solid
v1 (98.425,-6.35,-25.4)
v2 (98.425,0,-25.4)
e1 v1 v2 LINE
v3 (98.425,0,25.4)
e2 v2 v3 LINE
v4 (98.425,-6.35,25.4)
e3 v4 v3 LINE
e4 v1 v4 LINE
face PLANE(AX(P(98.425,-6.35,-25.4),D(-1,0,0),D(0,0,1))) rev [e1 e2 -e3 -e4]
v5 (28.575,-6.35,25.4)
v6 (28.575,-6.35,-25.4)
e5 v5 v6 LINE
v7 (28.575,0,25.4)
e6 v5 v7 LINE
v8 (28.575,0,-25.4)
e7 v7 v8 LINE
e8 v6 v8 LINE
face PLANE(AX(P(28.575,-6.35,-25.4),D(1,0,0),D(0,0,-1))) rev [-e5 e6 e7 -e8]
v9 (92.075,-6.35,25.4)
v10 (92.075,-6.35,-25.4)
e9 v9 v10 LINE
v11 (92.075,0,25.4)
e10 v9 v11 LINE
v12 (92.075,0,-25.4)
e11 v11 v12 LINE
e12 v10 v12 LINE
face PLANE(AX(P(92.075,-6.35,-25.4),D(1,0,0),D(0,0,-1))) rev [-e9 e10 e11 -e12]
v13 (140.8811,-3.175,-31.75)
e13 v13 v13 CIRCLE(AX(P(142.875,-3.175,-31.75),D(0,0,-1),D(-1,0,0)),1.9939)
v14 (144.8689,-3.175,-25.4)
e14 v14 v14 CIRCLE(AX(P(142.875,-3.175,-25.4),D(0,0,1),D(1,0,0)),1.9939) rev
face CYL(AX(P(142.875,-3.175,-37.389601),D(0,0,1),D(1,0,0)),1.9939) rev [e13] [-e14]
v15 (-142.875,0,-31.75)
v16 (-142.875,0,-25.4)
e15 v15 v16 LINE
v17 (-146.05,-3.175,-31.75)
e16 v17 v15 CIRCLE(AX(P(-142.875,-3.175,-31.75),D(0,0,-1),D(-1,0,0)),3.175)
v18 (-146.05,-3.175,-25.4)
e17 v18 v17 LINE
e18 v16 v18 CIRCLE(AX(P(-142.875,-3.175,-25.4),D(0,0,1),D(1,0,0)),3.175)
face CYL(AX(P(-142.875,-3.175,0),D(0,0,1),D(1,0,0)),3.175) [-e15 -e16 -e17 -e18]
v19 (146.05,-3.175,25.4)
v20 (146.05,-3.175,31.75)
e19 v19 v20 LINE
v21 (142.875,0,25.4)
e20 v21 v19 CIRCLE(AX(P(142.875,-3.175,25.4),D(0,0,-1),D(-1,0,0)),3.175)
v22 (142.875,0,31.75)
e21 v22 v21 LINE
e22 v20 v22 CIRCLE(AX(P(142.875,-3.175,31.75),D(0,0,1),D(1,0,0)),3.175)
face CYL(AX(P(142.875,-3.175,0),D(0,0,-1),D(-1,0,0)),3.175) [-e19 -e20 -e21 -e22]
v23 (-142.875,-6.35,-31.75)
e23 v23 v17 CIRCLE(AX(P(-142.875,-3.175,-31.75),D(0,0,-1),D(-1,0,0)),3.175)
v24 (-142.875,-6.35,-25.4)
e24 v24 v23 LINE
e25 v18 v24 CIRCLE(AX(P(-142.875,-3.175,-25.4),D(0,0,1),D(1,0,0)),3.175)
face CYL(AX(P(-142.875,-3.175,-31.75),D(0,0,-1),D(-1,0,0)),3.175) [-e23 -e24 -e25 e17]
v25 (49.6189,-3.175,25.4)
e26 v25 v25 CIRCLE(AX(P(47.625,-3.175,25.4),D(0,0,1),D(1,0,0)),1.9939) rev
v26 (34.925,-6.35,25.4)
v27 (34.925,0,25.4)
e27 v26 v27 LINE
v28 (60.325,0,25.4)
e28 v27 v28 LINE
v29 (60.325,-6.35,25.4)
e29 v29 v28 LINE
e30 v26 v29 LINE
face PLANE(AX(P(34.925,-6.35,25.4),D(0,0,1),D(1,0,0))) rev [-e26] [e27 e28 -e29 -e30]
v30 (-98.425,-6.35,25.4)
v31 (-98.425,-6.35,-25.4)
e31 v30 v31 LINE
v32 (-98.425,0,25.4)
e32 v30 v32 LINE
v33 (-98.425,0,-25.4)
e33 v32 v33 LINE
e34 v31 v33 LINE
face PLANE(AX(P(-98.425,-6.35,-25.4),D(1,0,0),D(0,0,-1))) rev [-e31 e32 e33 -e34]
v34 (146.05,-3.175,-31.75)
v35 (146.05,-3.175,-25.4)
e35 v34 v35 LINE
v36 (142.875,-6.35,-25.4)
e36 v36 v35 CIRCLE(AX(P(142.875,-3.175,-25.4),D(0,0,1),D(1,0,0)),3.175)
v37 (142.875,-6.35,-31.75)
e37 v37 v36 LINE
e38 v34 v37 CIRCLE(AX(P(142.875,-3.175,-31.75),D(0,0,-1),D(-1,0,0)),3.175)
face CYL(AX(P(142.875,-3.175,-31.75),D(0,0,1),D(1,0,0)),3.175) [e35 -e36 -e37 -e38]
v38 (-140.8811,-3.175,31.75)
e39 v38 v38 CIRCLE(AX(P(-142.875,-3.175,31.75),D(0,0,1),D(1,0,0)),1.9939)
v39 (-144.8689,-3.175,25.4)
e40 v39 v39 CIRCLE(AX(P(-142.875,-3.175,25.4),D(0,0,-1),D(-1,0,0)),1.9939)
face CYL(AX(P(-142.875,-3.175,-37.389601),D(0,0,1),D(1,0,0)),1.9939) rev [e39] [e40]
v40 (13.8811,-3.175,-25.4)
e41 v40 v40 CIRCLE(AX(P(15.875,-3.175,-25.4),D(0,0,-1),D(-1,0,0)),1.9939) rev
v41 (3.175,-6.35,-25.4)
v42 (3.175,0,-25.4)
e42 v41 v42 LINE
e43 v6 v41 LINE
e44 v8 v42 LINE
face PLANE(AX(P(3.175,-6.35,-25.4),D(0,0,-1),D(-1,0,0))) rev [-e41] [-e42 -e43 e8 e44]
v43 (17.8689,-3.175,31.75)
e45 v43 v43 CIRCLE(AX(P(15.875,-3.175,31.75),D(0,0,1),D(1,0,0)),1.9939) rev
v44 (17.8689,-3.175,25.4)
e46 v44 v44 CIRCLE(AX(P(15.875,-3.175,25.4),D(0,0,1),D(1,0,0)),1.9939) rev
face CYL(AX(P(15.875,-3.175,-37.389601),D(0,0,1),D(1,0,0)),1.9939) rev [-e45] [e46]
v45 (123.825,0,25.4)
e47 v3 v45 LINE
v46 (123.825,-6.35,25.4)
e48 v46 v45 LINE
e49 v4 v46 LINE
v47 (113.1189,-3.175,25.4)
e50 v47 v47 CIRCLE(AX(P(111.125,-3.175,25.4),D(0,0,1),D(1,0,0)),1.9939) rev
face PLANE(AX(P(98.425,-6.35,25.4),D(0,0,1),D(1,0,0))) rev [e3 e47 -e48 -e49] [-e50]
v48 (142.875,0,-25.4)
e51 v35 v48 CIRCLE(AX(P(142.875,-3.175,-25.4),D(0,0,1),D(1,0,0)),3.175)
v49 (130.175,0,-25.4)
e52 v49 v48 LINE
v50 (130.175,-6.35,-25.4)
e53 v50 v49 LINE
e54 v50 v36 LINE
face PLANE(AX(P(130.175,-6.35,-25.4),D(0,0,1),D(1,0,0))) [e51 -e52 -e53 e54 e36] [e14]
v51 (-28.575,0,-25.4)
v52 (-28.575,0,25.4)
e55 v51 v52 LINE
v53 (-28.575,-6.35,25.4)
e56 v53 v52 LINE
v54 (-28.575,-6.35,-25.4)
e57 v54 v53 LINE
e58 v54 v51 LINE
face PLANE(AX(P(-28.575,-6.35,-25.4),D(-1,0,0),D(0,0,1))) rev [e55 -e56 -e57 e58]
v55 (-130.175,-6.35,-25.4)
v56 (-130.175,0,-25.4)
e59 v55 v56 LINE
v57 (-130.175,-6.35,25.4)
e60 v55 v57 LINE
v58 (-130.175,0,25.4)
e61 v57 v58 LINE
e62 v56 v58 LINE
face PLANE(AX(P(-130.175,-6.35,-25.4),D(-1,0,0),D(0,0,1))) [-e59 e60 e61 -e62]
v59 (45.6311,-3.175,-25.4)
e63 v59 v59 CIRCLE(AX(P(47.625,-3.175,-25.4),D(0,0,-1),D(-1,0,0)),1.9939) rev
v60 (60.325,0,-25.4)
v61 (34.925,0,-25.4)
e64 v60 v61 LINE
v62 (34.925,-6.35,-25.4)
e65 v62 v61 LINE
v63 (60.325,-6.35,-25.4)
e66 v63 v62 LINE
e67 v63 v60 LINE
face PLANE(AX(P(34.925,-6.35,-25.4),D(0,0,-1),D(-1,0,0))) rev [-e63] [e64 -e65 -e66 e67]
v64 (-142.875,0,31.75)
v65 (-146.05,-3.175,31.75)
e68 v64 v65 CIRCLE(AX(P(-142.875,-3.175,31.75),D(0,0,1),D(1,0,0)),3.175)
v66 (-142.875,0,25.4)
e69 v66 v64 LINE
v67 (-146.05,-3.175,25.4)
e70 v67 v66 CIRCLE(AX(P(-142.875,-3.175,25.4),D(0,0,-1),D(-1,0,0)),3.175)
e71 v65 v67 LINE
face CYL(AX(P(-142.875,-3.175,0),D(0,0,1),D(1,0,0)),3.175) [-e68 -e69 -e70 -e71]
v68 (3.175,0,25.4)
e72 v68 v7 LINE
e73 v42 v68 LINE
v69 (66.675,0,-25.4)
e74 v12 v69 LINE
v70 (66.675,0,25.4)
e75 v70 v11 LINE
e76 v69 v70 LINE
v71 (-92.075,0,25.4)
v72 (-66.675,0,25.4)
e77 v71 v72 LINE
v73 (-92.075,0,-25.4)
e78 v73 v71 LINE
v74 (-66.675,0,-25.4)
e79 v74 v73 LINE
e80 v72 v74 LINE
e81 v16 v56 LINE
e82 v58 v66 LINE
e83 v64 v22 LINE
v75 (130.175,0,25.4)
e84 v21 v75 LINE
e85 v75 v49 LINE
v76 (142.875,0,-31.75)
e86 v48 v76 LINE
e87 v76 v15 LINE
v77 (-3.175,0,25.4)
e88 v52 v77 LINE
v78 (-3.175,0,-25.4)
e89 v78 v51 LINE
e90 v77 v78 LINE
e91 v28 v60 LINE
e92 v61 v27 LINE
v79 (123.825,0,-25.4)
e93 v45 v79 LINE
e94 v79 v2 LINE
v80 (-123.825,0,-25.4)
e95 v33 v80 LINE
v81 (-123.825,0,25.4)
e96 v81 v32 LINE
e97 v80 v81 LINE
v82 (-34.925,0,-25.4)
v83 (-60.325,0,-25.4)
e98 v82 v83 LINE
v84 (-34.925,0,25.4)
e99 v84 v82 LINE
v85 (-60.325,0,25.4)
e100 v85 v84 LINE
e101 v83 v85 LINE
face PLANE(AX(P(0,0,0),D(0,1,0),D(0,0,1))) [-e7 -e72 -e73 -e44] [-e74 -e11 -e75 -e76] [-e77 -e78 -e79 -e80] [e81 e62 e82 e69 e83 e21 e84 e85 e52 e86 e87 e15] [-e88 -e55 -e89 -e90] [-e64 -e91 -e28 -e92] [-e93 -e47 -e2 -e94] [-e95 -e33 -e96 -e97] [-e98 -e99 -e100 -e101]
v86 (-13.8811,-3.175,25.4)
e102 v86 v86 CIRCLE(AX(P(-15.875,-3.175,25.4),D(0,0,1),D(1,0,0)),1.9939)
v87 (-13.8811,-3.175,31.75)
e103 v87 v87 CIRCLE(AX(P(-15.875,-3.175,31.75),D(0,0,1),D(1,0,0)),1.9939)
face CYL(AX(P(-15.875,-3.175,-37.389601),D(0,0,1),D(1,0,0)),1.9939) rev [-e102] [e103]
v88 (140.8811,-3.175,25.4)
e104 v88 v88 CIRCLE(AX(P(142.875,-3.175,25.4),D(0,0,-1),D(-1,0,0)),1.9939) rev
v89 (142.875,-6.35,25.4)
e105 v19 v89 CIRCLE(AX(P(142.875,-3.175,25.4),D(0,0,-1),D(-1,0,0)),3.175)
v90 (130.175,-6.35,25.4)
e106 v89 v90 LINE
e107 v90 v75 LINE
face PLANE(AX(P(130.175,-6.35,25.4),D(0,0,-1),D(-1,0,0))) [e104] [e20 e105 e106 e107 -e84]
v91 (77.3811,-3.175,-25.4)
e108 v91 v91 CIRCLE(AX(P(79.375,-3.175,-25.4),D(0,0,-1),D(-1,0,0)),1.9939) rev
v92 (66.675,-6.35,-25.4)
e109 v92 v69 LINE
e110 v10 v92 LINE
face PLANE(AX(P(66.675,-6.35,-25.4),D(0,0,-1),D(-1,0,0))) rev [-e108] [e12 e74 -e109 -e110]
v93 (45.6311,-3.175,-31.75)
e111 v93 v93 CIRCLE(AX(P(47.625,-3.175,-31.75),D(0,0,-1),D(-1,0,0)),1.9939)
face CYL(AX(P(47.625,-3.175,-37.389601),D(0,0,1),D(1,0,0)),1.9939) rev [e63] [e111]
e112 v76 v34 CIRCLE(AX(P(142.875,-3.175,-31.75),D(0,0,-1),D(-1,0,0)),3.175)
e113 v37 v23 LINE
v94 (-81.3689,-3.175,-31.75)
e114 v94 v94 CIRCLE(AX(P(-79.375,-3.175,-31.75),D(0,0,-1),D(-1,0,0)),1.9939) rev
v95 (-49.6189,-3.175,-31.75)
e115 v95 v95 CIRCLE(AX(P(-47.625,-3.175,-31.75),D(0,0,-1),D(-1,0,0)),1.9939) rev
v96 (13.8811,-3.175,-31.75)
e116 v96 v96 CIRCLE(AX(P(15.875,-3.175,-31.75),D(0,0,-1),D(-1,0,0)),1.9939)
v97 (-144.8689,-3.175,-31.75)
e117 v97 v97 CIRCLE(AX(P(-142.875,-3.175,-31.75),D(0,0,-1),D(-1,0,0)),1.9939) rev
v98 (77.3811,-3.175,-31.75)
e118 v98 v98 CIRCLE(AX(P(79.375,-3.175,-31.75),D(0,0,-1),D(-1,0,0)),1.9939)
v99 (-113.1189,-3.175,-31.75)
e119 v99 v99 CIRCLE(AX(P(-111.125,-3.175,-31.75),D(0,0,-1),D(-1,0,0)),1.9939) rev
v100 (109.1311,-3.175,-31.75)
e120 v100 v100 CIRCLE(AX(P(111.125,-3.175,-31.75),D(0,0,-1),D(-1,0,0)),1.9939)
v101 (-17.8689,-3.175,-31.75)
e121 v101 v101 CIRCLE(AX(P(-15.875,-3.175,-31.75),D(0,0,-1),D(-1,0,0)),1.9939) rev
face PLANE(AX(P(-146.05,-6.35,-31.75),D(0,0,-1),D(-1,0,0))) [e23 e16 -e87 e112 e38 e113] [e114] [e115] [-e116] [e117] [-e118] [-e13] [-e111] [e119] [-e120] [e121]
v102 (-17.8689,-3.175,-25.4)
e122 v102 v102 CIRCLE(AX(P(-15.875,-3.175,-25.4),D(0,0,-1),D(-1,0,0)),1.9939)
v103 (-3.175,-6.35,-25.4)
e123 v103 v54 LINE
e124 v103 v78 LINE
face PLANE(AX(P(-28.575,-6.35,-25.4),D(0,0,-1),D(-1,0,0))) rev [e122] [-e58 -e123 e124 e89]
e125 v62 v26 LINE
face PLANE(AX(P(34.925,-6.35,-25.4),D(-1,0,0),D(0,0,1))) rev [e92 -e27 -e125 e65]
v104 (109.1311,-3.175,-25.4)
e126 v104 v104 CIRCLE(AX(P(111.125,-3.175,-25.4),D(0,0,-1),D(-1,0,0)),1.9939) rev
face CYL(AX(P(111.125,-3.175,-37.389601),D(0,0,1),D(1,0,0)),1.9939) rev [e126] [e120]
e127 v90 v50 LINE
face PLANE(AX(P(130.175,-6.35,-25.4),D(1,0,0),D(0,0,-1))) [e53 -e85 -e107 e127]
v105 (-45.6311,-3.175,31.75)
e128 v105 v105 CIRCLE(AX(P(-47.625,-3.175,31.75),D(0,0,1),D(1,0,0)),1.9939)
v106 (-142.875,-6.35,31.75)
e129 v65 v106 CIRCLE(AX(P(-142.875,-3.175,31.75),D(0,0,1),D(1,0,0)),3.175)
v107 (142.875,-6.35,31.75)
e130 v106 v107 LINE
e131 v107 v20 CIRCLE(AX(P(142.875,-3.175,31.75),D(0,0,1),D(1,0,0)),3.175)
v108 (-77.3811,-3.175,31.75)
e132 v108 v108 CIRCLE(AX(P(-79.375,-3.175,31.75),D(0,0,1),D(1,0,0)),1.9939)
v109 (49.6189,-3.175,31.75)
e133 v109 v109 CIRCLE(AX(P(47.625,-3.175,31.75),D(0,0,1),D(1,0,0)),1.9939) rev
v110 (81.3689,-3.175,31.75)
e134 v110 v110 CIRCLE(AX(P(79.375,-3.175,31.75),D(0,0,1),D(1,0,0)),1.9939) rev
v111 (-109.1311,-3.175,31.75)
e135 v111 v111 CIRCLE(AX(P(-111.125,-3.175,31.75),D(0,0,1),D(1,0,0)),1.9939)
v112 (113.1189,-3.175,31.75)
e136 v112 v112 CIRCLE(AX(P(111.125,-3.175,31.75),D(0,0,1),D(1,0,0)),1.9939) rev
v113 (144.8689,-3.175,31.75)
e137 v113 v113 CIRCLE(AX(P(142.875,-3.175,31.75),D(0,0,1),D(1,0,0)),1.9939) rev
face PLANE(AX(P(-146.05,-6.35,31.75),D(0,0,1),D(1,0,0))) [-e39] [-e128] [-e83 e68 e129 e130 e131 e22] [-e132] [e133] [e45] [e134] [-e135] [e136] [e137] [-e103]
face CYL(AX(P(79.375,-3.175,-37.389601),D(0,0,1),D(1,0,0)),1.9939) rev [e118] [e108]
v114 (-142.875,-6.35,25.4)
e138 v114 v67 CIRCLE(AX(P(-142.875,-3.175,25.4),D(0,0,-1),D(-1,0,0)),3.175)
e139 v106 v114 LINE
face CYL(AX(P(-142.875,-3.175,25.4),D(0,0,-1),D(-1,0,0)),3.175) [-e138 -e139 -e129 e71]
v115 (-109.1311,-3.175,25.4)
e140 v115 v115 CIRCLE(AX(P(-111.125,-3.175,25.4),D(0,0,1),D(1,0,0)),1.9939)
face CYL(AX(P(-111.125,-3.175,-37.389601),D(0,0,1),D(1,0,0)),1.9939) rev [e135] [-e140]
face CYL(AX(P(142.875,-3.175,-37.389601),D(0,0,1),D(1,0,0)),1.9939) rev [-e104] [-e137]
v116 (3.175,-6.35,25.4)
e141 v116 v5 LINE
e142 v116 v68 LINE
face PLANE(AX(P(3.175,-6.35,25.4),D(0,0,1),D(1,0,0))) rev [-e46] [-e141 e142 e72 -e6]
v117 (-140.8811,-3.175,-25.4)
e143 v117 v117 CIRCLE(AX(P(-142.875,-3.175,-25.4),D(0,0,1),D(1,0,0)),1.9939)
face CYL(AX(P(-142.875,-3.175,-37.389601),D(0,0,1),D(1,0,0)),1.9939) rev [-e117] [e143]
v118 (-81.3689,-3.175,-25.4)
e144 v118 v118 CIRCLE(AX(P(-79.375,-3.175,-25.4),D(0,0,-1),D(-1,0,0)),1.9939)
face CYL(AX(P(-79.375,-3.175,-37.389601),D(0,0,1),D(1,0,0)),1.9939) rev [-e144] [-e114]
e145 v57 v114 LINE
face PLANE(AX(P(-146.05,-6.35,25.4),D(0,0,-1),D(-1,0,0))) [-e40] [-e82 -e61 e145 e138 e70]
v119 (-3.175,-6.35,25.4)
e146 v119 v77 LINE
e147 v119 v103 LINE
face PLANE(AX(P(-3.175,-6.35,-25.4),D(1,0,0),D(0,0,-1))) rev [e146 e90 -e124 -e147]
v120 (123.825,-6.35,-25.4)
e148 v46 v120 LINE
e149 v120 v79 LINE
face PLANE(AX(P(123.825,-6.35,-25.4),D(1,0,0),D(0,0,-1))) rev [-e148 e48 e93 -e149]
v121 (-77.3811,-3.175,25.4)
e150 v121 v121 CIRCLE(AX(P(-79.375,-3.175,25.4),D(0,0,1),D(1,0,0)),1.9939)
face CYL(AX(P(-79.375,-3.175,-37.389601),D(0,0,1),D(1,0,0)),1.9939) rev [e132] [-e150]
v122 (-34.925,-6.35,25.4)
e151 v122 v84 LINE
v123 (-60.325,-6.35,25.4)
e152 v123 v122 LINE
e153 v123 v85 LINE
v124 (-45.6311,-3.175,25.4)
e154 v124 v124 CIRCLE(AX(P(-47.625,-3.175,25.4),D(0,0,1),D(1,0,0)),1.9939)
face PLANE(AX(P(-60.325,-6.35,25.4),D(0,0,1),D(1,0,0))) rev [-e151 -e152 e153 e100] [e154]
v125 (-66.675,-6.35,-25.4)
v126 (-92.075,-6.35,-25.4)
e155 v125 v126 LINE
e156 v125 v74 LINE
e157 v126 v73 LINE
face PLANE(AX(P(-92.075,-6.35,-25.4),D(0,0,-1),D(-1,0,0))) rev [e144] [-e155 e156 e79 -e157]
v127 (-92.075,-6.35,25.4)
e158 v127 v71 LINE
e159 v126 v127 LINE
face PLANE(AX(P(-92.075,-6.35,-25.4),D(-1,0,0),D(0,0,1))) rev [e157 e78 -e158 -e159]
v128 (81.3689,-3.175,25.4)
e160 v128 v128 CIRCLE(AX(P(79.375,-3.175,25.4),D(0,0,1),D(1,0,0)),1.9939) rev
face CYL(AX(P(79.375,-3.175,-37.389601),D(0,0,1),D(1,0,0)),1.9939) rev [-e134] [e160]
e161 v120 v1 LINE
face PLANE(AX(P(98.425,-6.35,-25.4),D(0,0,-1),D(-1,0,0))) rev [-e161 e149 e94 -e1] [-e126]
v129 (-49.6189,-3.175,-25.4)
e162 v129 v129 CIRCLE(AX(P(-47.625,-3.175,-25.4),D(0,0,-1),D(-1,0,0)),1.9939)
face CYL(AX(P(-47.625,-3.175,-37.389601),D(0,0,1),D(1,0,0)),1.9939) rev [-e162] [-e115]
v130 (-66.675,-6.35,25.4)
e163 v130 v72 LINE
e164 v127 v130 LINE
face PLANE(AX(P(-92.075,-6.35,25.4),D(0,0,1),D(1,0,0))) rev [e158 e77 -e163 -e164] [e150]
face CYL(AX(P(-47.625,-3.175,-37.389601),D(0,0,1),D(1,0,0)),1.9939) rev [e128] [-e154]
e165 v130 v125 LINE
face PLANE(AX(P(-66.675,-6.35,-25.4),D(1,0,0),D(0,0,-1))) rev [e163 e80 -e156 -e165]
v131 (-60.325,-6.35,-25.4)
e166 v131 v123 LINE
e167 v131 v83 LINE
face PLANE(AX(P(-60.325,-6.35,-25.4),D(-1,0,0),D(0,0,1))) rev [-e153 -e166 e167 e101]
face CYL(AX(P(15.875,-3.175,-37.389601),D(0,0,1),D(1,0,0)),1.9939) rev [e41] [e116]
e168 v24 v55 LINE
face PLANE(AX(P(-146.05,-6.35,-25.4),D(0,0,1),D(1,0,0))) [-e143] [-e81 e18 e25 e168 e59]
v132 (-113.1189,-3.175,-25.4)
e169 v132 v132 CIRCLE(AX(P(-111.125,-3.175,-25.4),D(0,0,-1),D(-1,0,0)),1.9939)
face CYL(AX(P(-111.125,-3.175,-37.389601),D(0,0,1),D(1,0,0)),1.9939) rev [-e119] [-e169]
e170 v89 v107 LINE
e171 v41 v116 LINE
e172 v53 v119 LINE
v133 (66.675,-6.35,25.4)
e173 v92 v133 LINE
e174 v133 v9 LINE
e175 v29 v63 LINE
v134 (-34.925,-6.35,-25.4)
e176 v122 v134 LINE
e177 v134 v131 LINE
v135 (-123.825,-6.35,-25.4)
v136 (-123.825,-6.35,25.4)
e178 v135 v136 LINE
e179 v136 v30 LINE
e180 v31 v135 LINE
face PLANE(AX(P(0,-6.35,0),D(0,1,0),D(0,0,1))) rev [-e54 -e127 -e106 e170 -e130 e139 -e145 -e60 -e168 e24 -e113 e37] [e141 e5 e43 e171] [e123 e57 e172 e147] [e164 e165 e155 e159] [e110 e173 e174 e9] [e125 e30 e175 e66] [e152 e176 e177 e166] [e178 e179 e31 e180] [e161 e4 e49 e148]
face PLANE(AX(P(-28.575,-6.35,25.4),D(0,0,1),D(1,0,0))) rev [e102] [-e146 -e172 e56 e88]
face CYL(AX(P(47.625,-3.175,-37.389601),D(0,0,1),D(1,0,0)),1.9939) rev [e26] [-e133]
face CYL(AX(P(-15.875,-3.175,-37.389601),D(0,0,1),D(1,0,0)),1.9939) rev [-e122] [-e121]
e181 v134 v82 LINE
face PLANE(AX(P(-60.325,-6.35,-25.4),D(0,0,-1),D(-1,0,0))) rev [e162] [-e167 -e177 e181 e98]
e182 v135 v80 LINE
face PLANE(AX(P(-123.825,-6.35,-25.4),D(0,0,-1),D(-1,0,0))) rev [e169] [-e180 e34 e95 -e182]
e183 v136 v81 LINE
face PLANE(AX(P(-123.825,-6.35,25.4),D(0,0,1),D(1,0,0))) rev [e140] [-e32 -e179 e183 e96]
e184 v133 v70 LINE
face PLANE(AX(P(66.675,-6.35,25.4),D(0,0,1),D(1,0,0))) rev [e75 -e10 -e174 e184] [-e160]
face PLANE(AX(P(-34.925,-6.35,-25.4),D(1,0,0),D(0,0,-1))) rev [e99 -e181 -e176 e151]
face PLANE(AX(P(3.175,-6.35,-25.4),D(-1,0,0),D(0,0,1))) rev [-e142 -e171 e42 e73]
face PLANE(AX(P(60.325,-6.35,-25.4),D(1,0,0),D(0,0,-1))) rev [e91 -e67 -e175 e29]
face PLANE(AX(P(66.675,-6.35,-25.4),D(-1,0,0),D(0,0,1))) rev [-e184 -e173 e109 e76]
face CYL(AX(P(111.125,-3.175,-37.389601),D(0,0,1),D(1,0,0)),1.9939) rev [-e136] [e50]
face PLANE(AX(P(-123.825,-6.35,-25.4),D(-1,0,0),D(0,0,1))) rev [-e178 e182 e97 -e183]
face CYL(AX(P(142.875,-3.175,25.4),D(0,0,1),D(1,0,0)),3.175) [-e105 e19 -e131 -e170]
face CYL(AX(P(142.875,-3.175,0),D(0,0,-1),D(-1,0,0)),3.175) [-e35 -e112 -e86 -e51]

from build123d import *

# Parameters (mm, degrees)
SKETCH1_W           = 25.4
SKETCH1_H           = 50.8
BOSS_EXTRUDE1_DEPTH = 6.35
CUT_EXTRUDE1_REACH  = 161.384
SKETCH2_R           = 1.9939
FILLET2_R           = 3.175


with BuildPart() as part:
    # Sketch1 → Boss-Extrude1 (new body)
    with BuildSketch(Plane(origin=(0, 0, 0), x_dir=(1, 0, 0), z_dir=(0, 1, 0))):
        Polygon((-146.05, 25.4), (-130.175, 25.4), (-130.175, -25.4), (-146.05, -25.4), (-146.05, -31.75), (146.05, -31.75), (146.05, -25.4), (130.175, -25.4), (130.175, 25.4), (146.05, 25.4), (146.05, 31.75), (-146.05, 31.75), align=None)
        with Locations((-15.875, 0)):
            Rectangle(SKETCH1_W, SKETCH1_H, mode=Mode.SUBTRACT)
        with Locations((111.125, 0)):
            Rectangle(SKETCH1_W, SKETCH1_H, mode=Mode.SUBTRACT)
        with Locations((-47.625, 0)):
            Rectangle(SKETCH1_W, SKETCH1_H, mode=Mode.SUBTRACT)
        with Locations((-79.375, 0)):
            Rectangle(SKETCH1_W, SKETCH1_H, mode=Mode.SUBTRACT)
        with Locations((-111.125, 0)):
            Rectangle(SKETCH1_W, SKETCH1_H, mode=Mode.SUBTRACT)
        with Locations((79.375, 0)):
            Rectangle(SKETCH1_W, SKETCH1_H, mode=Mode.SUBTRACT)
        with Locations((47.625, 0)):
            Rectangle(SKETCH1_W, SKETCH1_H, mode=Mode.SUBTRACT)
        with Locations((15.875, 0)):
            Rectangle(SKETCH1_W, SKETCH1_H, mode=Mode.SUBTRACT)
    extrude(amount=-BOSS_EXTRUDE1_DEPTH)

    # Cut-Extrude1: up to this face of the body (flat: up to its plane)
    cut_extrude1_end = Plane(part.part.faces().sort_by_distance((0, -3.175, -31.75))[0])
    # Sketch2 → Cut-Extrude1 (cut, up to the picked face)
    with BuildSketch(Plane.XY.offset(31.75), mode=Mode.PRIVATE) as cut_extrude1_sk1:
        with Locations((-142.875, -3.175)):
            Circle(SKETCH2_R)
    cut_extrude1_tool1 = split(extrude(cut_extrude1_sk1.sketch, amount=-CUT_EXTRUDE1_REACH, mode=Mode.PRIVATE), bisect_by=cut_extrude1_end, keep=Keep.BOTH, mode=Mode.PRIVATE)
    # Sketch2 → Cut-Extrude1 (cut, up to the picked face)
    with BuildSketch(Plane.XY.offset(31.75), mode=Mode.PRIVATE) as cut_extrude1_sk2:
        with Locations((-111.125, -3.175)):
            Circle(SKETCH2_R)
    cut_extrude1_tool2 = split(extrude(cut_extrude1_sk2.sketch, amount=-CUT_EXTRUDE1_REACH, mode=Mode.PRIVATE), bisect_by=cut_extrude1_end, keep=Keep.BOTH, mode=Mode.PRIVATE)
    # Sketch2 → Cut-Extrude1 (cut, up to the picked face)
    with BuildSketch(Plane.XY.offset(31.75), mode=Mode.PRIVATE) as cut_extrude1_sk3:
        with Locations((-79.375, -3.175)):
            Circle(SKETCH2_R)
    cut_extrude1_tool3 = split(extrude(cut_extrude1_sk3.sketch, amount=-CUT_EXTRUDE1_REACH, mode=Mode.PRIVATE), bisect_by=cut_extrude1_end, keep=Keep.BOTH, mode=Mode.PRIVATE)
    # Sketch2 → Cut-Extrude1 (cut, up to the picked face)
    with BuildSketch(Plane.XY.offset(31.75), mode=Mode.PRIVATE) as cut_extrude1_sk4:
        with Locations((-47.625, -3.175)):
            Circle(SKETCH2_R)
    cut_extrude1_tool4 = split(extrude(cut_extrude1_sk4.sketch, amount=-CUT_EXTRUDE1_REACH, mode=Mode.PRIVATE), bisect_by=cut_extrude1_end, keep=Keep.BOTH, mode=Mode.PRIVATE)
    # Sketch2 → Cut-Extrude1 (cut, up to the picked face)
    with BuildSketch(Plane.XY.offset(31.75), mode=Mode.PRIVATE) as cut_extrude1_sk5:
        with Locations((-15.875, -3.175)):
            Circle(SKETCH2_R)
    cut_extrude1_tool5 = split(extrude(cut_extrude1_sk5.sketch, amount=-CUT_EXTRUDE1_REACH, mode=Mode.PRIVATE), bisect_by=cut_extrude1_end, keep=Keep.BOTH, mode=Mode.PRIVATE)
    # Sketch2 → Cut-Extrude1 (cut, up to the picked face)
    with BuildSketch(Plane.XY.offset(31.75), mode=Mode.PRIVATE) as cut_extrude1_sk6:
        with Locations((15.875, -3.175)):
            Circle(SKETCH2_R)
    cut_extrude1_tool6 = split(extrude(cut_extrude1_sk6.sketch, amount=-CUT_EXTRUDE1_REACH, mode=Mode.PRIVATE), bisect_by=cut_extrude1_end, keep=Keep.BOTH, mode=Mode.PRIVATE)
    # Sketch2 → Cut-Extrude1 (cut, up to the picked face)
    with BuildSketch(Plane.XY.offset(31.75), mode=Mode.PRIVATE) as cut_extrude1_sk7:
        with Locations((47.625, -3.175)):
            Circle(SKETCH2_R)
    cut_extrude1_tool7 = split(extrude(cut_extrude1_sk7.sketch, amount=-CUT_EXTRUDE1_REACH, mode=Mode.PRIVATE), bisect_by=cut_extrude1_end, keep=Keep.BOTH, mode=Mode.PRIVATE)
    # Sketch2 → Cut-Extrude1 (cut, up to the picked face)
    with BuildSketch(Plane.XY.offset(31.75), mode=Mode.PRIVATE) as cut_extrude1_sk8:
        with Locations((79.375, -3.175)):
            Circle(SKETCH2_R)
    cut_extrude1_tool8 = split(extrude(cut_extrude1_sk8.sketch, amount=-CUT_EXTRUDE1_REACH, mode=Mode.PRIVATE), bisect_by=cut_extrude1_end, keep=Keep.BOTH, mode=Mode.PRIVATE)
    # Sketch2 → Cut-Extrude1 (cut, up to the picked face)
    with BuildSketch(Plane.XY.offset(31.75), mode=Mode.PRIVATE) as cut_extrude1_sk9:
        with Locations((111.125, -3.175)):
            Circle(SKETCH2_R)
    cut_extrude1_tool9 = split(extrude(cut_extrude1_sk9.sketch, amount=-CUT_EXTRUDE1_REACH, mode=Mode.PRIVATE), bisect_by=cut_extrude1_end, keep=Keep.BOTH, mode=Mode.PRIVATE)
    # Sketch2 → Cut-Extrude1 (cut, up to the picked face)
    with BuildSketch(Plane.XY.offset(31.75), mode=Mode.PRIVATE) as cut_extrude1_sk10:
        with Locations((142.875, -3.175)):
            Circle(SKETCH2_R)
    cut_extrude1_tool10 = split(extrude(cut_extrude1_sk10.sketch, amount=-CUT_EXTRUDE1_REACH, mode=Mode.PRIVATE), bisect_by=cut_extrude1_end, keep=Keep.BOTH, mode=Mode.PRIVATE)
    add(cut_extrude1_tool1.solids().sort_by(Axis((-142.875, -3.175, 31.75), (0, 0, -1)))[0], mode=Mode.SUBTRACT)
    add(cut_extrude1_tool2.solids().sort_by(Axis((-111.125, -3.175, 31.75), (0, 0, -1)))[0], mode=Mode.SUBTRACT)
    add(cut_extrude1_tool3.solids().sort_by(Axis((-79.375, -3.175, 31.75), (0, 0, -1)))[0], mode=Mode.SUBTRACT)
    add(cut_extrude1_tool4.solids().sort_by(Axis((-47.625, -3.175, 31.75), (0, 0, -1)))[0], mode=Mode.SUBTRACT)
    add(cut_extrude1_tool5.solids().sort_by(Axis((-15.875, -3.175, 31.75), (0, 0, -1)))[0], mode=Mode.SUBTRACT)
    add(cut_extrude1_tool6.solids().sort_by(Axis((15.875, -3.175, 31.75), (0, 0, -1)))[0], mode=Mode.SUBTRACT)
    add(cut_extrude1_tool7.solids().sort_by(Axis((47.625, -3.175, 31.75), (0, 0, -1)))[0], mode=Mode.SUBTRACT)
    add(cut_extrude1_tool8.solids().sort_by(Axis((79.375, -3.175, 31.75), (0, 0, -1)))[0], mode=Mode.SUBTRACT)
    add(cut_extrude1_tool9.solids().sort_by(Axis((111.125, -3.175, 31.75), (0, 0, -1)))[0], mode=Mode.SUBTRACT)
    add(cut_extrude1_tool10.solids().sort_by(Axis((142.875, -3.175, 31.75), (0, 0, -1)))[0], mode=Mode.SUBTRACT)

    # Fillet2
    fillet2_edges = [part.edges().sort_by_distance(p)[0] for p in [
        (-146.05, -6.35, 28.575),
        (-146.05, 0, 28.575),
        (-146.05, -6.35, -28.575),
        (-146.05, 0, -28.575),
        (146.05, -6.35, -28.575),
        (146.05, 0, -28.575),
        (146.05, -6.35, 28.575),
        (146.05, 0, 28.575),
    ]]
    fillet(fillet2_edges, radius=FILLET2_R - 0.0001)  # a hair under: the kernel refuses the full size


solid = part.part
